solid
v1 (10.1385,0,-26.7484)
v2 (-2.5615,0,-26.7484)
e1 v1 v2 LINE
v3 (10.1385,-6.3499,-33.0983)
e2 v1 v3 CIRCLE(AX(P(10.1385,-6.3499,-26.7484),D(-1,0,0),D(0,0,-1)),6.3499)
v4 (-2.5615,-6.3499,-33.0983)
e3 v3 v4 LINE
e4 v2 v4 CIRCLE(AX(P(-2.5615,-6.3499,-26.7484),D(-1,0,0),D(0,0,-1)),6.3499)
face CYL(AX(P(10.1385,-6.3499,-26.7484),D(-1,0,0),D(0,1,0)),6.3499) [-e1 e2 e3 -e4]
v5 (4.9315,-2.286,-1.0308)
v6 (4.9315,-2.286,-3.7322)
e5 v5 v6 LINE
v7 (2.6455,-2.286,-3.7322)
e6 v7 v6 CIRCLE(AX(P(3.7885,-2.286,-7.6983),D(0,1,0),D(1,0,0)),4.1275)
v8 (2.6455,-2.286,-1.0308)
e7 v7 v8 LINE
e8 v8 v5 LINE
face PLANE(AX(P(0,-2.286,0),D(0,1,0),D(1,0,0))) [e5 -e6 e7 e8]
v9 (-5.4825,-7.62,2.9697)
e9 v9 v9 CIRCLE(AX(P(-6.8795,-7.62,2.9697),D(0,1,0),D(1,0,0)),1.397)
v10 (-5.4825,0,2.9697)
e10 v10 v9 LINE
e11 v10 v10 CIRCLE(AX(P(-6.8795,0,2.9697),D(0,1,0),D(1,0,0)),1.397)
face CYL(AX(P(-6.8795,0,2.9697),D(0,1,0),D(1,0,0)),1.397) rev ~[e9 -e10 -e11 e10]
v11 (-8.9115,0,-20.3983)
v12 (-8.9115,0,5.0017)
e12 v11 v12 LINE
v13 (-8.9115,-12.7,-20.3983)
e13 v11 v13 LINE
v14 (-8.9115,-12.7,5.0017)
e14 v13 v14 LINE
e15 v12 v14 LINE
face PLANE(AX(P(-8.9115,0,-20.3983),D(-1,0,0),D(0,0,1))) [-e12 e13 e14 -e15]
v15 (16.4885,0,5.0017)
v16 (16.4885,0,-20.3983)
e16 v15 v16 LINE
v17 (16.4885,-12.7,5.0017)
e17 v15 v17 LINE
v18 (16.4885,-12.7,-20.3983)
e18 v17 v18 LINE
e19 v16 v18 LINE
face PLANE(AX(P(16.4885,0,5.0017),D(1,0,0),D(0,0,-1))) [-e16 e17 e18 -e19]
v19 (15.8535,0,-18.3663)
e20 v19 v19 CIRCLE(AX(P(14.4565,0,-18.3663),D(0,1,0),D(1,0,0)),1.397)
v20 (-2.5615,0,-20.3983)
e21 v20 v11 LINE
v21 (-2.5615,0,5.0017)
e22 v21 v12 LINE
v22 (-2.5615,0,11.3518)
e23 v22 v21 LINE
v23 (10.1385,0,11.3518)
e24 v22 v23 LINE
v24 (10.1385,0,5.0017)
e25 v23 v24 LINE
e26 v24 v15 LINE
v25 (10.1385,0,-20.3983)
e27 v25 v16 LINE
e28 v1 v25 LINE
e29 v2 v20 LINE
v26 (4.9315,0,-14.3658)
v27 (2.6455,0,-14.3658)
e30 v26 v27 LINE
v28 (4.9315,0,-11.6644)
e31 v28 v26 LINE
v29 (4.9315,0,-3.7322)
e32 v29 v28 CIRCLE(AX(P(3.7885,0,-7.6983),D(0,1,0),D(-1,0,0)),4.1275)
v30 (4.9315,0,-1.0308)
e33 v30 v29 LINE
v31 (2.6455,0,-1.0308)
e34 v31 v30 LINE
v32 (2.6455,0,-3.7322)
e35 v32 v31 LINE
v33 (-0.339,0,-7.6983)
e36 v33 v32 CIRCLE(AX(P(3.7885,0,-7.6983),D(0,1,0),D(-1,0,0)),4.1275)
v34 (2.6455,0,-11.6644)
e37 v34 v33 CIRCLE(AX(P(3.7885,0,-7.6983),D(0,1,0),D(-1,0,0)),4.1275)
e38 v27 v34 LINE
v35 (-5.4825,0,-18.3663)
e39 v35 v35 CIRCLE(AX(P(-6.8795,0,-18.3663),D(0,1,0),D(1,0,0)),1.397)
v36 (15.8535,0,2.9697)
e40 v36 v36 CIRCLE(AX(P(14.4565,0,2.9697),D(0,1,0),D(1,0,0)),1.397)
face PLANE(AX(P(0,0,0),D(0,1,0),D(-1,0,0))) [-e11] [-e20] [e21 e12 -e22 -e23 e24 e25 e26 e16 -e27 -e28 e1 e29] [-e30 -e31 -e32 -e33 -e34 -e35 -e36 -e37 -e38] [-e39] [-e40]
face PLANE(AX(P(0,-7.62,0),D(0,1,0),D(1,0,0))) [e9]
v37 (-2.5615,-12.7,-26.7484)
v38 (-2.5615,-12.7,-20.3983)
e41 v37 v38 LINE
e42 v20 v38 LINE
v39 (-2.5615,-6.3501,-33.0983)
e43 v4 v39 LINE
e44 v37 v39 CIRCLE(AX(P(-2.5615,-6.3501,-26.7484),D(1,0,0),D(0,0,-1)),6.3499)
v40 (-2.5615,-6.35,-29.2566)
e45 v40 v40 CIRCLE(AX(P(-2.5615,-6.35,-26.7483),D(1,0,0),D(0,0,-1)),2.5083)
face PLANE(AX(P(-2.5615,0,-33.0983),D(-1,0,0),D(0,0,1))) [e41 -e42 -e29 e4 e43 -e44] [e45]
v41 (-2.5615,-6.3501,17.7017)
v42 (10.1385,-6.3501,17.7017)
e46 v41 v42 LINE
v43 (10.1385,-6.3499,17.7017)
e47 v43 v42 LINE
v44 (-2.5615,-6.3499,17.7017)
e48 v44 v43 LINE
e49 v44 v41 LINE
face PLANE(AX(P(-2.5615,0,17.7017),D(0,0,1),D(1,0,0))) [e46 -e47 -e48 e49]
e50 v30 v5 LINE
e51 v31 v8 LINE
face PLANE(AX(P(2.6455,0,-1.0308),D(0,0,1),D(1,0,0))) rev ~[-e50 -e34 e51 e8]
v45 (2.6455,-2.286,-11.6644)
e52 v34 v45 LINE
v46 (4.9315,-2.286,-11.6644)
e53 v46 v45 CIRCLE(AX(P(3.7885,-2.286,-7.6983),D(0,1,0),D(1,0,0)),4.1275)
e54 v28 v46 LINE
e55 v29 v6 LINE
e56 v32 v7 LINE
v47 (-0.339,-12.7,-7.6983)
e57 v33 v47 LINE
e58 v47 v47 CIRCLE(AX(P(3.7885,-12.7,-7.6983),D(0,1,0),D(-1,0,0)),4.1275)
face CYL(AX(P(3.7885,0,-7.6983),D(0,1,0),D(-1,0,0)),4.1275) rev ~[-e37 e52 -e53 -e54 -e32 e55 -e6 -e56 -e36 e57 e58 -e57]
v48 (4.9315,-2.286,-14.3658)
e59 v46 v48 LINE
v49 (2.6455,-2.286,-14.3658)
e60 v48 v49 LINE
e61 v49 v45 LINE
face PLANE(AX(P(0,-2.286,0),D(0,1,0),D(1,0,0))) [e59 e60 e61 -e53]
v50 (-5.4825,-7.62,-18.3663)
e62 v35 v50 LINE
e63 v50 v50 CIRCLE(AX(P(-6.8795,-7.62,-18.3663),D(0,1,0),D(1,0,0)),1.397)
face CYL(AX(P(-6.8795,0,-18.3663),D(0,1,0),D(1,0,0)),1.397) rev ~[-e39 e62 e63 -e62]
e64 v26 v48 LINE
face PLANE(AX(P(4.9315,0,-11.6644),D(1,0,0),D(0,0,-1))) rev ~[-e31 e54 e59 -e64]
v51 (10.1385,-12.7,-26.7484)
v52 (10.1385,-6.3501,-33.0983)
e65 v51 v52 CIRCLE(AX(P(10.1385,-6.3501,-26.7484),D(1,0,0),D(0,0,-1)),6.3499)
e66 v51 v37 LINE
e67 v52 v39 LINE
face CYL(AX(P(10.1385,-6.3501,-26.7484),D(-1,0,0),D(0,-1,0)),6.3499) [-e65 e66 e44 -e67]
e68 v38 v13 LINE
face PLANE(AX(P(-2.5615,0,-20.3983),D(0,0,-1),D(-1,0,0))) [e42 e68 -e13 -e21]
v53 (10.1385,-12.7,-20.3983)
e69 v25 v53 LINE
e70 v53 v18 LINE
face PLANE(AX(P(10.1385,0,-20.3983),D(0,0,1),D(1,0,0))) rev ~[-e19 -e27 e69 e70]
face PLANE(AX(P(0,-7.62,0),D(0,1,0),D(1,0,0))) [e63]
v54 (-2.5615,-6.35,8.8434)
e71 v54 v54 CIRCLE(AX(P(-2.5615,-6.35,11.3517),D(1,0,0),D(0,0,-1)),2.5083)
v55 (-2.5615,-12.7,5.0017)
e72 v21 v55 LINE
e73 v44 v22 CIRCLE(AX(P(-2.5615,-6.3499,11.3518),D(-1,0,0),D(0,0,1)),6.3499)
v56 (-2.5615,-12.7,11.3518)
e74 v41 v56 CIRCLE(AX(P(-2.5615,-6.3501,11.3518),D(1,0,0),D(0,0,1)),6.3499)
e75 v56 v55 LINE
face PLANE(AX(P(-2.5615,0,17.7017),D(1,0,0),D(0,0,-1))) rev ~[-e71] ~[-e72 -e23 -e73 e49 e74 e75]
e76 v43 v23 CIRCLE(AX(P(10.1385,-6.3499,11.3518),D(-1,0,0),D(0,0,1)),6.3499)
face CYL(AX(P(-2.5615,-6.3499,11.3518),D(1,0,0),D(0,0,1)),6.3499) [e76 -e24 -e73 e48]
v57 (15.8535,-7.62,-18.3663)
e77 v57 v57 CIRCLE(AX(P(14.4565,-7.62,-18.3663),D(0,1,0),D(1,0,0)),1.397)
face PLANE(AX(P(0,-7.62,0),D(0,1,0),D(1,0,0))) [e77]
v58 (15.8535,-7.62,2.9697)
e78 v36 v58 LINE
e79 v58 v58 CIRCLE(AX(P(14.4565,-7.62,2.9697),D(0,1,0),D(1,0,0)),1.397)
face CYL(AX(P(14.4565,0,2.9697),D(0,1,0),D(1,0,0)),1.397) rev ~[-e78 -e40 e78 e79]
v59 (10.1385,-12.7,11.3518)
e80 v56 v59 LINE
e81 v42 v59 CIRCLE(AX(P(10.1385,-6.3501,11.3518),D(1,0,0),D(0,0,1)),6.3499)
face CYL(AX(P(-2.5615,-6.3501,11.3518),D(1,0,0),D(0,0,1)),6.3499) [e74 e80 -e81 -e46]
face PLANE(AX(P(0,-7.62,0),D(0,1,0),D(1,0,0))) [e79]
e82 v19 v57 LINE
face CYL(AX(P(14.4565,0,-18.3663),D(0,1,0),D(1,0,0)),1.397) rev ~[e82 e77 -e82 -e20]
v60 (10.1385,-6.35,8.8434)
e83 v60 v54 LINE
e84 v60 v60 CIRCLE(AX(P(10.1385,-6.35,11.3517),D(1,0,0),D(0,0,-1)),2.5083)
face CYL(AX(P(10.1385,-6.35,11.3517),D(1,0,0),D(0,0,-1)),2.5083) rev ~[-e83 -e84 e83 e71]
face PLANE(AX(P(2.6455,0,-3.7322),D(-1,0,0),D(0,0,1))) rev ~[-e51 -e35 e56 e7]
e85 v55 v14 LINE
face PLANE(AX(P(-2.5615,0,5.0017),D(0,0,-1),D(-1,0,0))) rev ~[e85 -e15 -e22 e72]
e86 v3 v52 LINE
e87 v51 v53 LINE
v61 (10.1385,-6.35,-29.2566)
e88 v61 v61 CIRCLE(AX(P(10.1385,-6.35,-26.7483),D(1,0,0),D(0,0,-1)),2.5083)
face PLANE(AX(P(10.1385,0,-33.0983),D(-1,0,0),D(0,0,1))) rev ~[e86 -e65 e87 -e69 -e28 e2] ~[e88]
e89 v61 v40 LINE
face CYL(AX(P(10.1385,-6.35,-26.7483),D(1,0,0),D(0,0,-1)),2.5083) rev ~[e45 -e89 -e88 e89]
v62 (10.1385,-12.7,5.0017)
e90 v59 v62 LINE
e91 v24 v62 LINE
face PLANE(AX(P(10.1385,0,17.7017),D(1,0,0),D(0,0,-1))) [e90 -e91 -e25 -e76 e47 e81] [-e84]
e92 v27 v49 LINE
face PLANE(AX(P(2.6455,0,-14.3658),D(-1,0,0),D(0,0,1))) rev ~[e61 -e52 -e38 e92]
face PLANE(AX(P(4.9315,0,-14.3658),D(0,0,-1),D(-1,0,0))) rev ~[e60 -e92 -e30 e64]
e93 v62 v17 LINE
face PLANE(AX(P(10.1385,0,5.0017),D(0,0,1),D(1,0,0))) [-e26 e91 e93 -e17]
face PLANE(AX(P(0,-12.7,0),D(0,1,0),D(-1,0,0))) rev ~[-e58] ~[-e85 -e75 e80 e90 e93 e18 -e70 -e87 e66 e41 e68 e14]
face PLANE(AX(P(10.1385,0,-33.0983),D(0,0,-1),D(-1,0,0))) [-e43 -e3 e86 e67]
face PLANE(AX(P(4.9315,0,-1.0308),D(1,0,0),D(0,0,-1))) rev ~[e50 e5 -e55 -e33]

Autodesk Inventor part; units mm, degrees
ref_plane "YZ Plane" through (0, 0, 0) normal (1, 0, 0) x (0, 1, 0)
ref_plane "XZ Plane" through (0, 0, 0) normal (0, 1, 0) x (-1, 0, 0)
ref_plane "XY Plane" through (0, 0, 0) normal (0, 0, 1) x (1, 0, 0)
sketch "Sketch1" plane through (0, 0, 0) normal (0, 1, 0) x (-1, 0, 0)
  line L0 (8.9115, 17.7017) -> (-16.4885, 17.7017)
  line L1 (-16.4885, 17.7017) -> (-16.4885, -33.0983)
  line L2 (-16.4885, -33.0983) -> (8.9115, -33.0983)
  line L3 (8.9115, -33.0983) -> (8.9115, 17.7017)
  line L4 (8.9115, 17.7017) -> (2.5615, 17.7017)
  line L5 (2.5615, 17.7017) -> (2.5615, 5.0017)
  line L6 (2.5615, 5.0017) -> (8.9115, 5.0017)
  line L7 (8.9115, 5.0017) -> (8.9115, 17.7017)
  line L8 (-16.4885, 17.7017) -> (-10.1385, 17.7017)
  line L9 (-10.1385, 17.7017) -> (-10.1385, 5.0017)
  line L10 (-10.1385, 5.0017) -> (-16.4885, 5.0017)
  line L11 (-16.4885, 5.0017) -> (-16.4885, 17.7017)
  line L12 (8.9115, -33.0983) -> (2.5615, -33.0983)
  line L13 (2.5615, -33.0983) -> (2.5615, -20.3983)
  line L14 (2.5615, -20.3983) -> (8.9115, -20.3983)
  line L15 (8.9115, -20.3983) -> (8.9115, -33.0983)
  line L16 (-16.4885, -33.0983) -> (-10.1385, -33.0983)
  line L17 (-10.1385, -33.0983) -> (-10.1385, -20.3983)
  line L18 (-10.1385, -20.3983) -> (-16.4885, -20.3983)
  line L19 (-16.4885, -20.3983) -> (-16.4885, -33.0983)
  circle A0 centre (-3.7885, -7.6983) radius 4.1275
  point P0 (0, 0)
  dimension "d0" = 25.4
  dimension "d1" = 50.8
  dimension "d2" = 6.35
  dimension "d3" = 12.7
  dimension "d4" = 6.35
  dimension "d5" = 12.7
  dimension "d6" = 6.35
  dimension "d7" = 12.7
  dimension "d8" = 6.35
  dimension "d9" = 12.7
  dimension "d10" = 8.255
extrude "Extrusion1" add sketch "Sketch1" against normal blind 12.7 contours L5 L6 L3 L14 L13 L2 L17 L18 L1 L10 L9 L0
sketch "Sketch2" plane through (10.1385, -12.7, 17.7017) normal (1, 0, 0) x (0, 0, -1)
  circle A0 centre (6.35, 6.35) radius 2.5083
  line L0 (0, 0) -> (0, 12.7) projected
  line L1 (12.7, 0) -> (0, 0) projected
  circle A1 centre (44.45, 6.35) radius 2.5083
  line L2 (38.1, 12.7) -> (50.8, 12.7) projected
  line L3 (50.8, 12.7) -> (50.8, 0) projected
  point P0 (17.7017, 12.7)
  dimension "d13" = 5.0165
  dimension "d14" = 6.35
  dimension "d15" = 6.35
  dimension "d16" = 5.0165
  dimension "d17" = 6.35
  dimension "d18" = 6.35
extrude "Extrusion2" cut sketch "Sketch2" against normal blind 12.7
fillet "Fillet1" radius 6.35 4 edges at (3.7885, 0, 17.7017) (3.7885, -12.7, 17.7017) (3.7885, 0, -33.0983) (3.7885, -12.7, -33.0983)
sketch "Sketch3" plane through (0, 0, 0) normal (0, 1, 0) x (1, 0, 0)
  circle A0 centre (-6.8795, -2.9697) radius 1.397
  line L0 (-8.9115, -5.0017) -> (-2.5615, -5.0017) projected
  line L1 (-8.9115, 20.3983) -> (-8.9115, -5.0017) projected
  circle A1 centre (14.4565, -2.9697) radius 1.397
  line L2 (16.4885, -5.0017) -> (16.4885, 20.3983) projected
  circle A2 centre (14.4565, 18.3663) radius 1.397
  line L3 (16.4885, 20.3983) -> (10.1385, 20.3983) projected
  circle A3 centre (-6.8795, 18.3663) radius 1.397
  point P0 (0, 0)
  dimension "d22" = 2.794
  dimension "d23" = 2.032
  dimension "d24" = 2.032
  dimension "d25" = 2.794
  dimension "d26" = 2.032
  dimension "d27" = 2.794
  dimension "d28" = 2.032
  dimension "d29" = 2.794
extrude "Extrusion3" cut sketch "Sketch3" against normal blind 7.62
sketch "Sketch4" plane through (0, 0, 0) normal (0, 1, 0) x (1, 0, 0)
  line L0 (2.6455, 1.0308) -> (4.9315, 1.0308)
  line L1 (4.9315, 1.0308) -> (4.9315, 3.7322)
  line L2 (2.6455, 3.7322) -> (2.6455, 1.0308)
  circle A0 centre (3.7885, 7.6983) radius 4.1275 projected
  line L3 (4.9315, 14.3658) -> (2.6455, 14.3658)
  line L4 (2.6455, 14.3658) -> (2.6455, 11.6644)
  line L5 (4.9315, 11.6644) -> (4.9315, 14.3658)
  point P0 (0, 0)
  dimension "d32" = 2.286
  dimension "d34" = 8.255
  dimension "d36" = 1.143
  dimension "d37" = 2.286
extrude "Extrusion4" cut sketch "Sketch4" against normal blind 2.286 contours L2 A0 L1 L0 | L4 L3 L5 A0
properties part number "bottom_anchor_v3"
